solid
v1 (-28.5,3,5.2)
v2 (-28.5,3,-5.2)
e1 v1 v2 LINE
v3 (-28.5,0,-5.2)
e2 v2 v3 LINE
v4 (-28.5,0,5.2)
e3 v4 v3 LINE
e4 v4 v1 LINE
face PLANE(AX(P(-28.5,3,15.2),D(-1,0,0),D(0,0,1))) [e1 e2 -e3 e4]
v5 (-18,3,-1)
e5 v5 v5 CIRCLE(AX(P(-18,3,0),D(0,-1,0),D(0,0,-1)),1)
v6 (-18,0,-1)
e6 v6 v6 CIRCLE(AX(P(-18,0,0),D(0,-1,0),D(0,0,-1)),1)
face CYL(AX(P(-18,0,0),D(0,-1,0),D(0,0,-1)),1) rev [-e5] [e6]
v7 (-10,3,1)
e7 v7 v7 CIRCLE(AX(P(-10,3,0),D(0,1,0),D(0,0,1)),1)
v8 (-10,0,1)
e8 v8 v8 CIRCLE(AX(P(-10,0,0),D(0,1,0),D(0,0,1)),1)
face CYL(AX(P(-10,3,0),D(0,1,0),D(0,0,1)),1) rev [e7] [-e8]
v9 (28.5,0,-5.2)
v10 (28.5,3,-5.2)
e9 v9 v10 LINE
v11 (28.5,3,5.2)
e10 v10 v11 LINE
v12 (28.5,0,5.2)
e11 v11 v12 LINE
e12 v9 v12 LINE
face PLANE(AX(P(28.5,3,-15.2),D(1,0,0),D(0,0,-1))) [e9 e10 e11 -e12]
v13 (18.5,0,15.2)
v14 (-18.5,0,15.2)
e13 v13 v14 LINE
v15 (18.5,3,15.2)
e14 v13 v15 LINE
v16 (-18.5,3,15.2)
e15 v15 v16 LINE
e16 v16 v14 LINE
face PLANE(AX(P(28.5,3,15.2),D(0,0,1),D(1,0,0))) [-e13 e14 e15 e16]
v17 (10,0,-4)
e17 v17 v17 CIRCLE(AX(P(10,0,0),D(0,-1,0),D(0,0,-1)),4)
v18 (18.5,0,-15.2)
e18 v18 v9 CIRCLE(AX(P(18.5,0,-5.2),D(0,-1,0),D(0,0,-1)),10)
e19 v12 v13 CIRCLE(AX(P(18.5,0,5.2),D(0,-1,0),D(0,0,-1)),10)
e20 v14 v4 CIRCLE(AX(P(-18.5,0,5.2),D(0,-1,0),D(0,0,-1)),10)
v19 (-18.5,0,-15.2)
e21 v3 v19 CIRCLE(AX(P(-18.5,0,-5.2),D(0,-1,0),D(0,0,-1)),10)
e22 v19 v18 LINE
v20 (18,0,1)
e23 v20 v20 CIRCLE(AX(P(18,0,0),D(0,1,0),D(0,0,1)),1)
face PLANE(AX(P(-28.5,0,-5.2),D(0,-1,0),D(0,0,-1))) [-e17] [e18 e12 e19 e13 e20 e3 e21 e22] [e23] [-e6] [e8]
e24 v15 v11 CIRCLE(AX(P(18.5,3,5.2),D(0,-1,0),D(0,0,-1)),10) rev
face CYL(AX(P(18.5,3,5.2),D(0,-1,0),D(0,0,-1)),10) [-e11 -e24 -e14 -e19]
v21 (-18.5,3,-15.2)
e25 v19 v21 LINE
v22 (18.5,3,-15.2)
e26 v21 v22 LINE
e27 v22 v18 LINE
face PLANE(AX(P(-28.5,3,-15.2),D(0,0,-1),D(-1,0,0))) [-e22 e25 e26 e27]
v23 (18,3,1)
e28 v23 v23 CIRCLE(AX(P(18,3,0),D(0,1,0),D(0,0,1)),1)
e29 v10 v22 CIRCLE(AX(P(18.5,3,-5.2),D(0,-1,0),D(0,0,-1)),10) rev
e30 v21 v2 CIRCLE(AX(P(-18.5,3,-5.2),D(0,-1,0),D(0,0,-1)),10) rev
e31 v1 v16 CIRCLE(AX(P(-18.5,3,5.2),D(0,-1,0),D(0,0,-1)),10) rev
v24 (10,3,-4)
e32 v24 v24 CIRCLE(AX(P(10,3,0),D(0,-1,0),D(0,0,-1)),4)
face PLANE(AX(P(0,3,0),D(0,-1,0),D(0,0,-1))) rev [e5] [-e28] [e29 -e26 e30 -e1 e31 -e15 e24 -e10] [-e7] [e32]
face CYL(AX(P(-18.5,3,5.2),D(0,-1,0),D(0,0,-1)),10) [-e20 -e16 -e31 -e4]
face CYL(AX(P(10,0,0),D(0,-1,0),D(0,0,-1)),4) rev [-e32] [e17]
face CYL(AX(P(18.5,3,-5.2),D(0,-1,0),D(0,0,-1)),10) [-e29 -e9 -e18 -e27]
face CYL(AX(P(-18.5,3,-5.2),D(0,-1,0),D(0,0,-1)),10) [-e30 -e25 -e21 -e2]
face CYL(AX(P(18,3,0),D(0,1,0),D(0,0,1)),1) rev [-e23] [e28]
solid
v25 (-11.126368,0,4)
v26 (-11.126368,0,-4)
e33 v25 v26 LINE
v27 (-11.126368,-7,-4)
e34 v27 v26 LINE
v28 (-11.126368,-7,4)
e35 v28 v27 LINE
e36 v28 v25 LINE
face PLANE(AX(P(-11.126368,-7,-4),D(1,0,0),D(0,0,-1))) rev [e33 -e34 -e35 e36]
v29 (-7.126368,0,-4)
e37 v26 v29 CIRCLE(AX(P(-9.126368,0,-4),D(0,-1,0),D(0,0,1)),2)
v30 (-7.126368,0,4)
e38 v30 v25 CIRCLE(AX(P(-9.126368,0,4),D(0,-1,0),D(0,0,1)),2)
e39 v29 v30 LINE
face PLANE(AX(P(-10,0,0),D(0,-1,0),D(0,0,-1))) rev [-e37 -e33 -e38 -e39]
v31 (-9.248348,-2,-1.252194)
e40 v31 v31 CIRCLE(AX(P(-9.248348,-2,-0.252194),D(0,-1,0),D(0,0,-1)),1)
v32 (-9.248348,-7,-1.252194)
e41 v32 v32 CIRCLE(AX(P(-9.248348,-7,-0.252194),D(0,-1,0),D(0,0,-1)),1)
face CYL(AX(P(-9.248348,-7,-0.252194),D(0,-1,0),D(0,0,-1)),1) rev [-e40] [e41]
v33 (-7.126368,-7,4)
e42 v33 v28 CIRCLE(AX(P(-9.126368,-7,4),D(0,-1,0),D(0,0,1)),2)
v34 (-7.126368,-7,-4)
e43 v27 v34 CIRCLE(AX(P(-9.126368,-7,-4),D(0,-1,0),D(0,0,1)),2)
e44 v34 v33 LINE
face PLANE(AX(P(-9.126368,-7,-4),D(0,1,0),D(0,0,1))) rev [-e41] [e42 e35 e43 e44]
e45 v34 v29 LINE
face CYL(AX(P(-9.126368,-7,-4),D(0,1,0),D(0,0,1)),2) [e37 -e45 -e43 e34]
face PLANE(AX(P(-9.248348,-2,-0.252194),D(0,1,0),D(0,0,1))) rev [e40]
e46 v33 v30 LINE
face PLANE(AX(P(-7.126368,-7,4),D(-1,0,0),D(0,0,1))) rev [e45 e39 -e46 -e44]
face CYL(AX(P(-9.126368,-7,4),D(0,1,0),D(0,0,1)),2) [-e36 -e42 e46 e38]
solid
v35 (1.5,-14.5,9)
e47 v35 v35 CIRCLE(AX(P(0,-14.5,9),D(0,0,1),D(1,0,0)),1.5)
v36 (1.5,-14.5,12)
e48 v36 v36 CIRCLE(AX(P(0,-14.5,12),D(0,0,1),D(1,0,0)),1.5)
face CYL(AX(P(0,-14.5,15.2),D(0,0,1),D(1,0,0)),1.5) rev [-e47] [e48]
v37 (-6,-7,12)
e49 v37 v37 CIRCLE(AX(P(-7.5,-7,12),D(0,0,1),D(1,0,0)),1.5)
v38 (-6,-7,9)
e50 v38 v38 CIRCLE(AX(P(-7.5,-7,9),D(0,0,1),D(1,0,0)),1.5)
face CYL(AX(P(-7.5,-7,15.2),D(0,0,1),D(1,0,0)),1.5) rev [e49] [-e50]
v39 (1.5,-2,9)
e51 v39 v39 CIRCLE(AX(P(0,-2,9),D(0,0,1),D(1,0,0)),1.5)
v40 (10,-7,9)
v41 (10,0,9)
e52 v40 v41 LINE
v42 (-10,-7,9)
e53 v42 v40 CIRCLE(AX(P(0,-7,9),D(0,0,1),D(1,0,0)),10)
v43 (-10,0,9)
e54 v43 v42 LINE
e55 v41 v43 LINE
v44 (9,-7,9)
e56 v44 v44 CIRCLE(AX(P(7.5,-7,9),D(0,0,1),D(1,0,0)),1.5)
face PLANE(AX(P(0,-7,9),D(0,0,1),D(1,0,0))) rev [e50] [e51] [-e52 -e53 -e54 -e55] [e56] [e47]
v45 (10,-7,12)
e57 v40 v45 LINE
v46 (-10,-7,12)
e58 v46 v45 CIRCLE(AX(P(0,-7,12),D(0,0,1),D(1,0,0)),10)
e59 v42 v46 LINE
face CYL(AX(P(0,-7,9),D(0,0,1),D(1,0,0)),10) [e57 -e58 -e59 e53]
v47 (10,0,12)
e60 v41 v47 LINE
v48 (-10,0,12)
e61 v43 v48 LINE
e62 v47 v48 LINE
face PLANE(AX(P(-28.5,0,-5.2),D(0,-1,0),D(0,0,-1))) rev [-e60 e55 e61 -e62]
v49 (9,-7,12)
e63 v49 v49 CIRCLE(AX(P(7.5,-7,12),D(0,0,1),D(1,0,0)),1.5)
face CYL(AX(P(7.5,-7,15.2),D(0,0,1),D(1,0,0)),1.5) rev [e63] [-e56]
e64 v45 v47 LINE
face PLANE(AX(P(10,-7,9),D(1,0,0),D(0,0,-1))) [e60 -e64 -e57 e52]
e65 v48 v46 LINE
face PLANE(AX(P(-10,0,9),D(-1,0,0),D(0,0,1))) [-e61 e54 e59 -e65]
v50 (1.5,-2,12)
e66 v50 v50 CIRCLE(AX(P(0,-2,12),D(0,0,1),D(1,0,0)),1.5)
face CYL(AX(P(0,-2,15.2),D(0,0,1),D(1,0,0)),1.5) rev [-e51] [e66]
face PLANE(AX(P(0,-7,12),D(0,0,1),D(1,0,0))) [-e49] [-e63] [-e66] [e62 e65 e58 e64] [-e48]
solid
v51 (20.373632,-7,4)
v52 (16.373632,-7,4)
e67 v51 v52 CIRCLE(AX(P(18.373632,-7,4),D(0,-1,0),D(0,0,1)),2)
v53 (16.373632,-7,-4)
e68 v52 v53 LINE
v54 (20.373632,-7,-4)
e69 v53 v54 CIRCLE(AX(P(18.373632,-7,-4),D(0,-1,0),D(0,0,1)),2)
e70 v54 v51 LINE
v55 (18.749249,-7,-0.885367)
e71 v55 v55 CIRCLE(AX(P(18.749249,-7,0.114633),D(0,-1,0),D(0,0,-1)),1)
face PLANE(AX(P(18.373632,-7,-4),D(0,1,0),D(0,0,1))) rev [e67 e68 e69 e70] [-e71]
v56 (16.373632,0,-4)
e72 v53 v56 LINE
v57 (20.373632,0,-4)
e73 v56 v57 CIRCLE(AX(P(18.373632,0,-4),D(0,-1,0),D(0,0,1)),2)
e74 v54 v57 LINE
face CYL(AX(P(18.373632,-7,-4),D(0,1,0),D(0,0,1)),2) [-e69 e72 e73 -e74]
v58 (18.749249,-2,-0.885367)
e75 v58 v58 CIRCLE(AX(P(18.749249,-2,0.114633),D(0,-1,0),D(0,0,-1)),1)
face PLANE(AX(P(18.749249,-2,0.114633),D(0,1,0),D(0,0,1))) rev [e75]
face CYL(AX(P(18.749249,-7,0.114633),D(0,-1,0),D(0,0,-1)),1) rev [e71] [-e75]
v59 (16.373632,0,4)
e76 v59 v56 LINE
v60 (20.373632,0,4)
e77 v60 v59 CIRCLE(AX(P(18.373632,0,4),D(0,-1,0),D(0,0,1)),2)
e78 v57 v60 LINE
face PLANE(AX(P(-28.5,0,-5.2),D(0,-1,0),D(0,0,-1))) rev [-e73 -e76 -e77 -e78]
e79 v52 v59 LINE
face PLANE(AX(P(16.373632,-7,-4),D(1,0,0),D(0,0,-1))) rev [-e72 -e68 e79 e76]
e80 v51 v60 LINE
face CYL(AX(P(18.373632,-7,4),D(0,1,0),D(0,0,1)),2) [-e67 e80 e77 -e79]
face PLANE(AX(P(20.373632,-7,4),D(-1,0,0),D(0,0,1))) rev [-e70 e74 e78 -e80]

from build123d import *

# Parameters (mm, degrees)
SKETCH1_W                    = 57
SKETCH1_H                    = 30.4
BOSS_EXTRUDE1_DEPTH          = 3
BOSS_EXTRUDE2_DEPTH          = 7
BOSS_EXTRUDE3_DEPTH          = 3
BOSS_EXTRUDE4_DEPTH          = 7
F_8_0_8_DIAMETER_HOLE1_D     = 8
F_2_0_2_DIAMETER_HOLE1_D     = 2
F_2_0_2_DIAMETER_HOLE2_D     = 2
F_2_0_2_DIAMETER_HOLE2_DEPTH = 3
F_3_0_3_DIAMETER_HOLE1_D     = 3
F_3_0_3_DIAMETER_HOLE1_DEPTH = 6.2
F_3_0_3_DIAMETER_HOLE2_D     = 3
F_3_0_3_DIAMETER_HOLE2_DEPTH = 30.4
F_2_0_2_DIAMETER_HOLE3_D     = 2
F_2_0_2_DIAMETER_HOLE3_DEPTH = 5
FILLET1_R                    = 10


with BuildPart() as part:
    # Sketch1 → Boss-Extrude1 (new body)
    with BuildSketch(Plane.XZ):
        Rectangle(SKETCH1_W, SKETCH1_H)
    extrude(amount=-BOSS_EXTRUDE1_DEPTH)

    # Sketch2 → Boss-Extrude2 (add)
    with BuildSketch(Plane.XZ):
        with BuildLine():
            Line((16.37363234, -4), (16.37363234, 4))
            ThreePointArc((16.37363234, 4), (18.37363234, 6), (20.37363234, 4))
            Line((20.37363234, 4), (20.37363234, -4))
            ThreePointArc((20.37363234, -4), (18.37363234, -6), (16.37363234, -4))
        make_face()
    extrude(amount=BOSS_EXTRUDE2_DEPTH)

    # Sketch3 → Boss-Extrude3 (add)
    with BuildSketch(Plane.XY.offset(12)):
        with BuildLine():
            Line((10, -7), (10, 0))
            Line((10, 0), (-10, 0))
            Line((-10, 0), (-10, -7))
            ThreePointArc((-10, -7), (0, -17), (10, -7))
        make_face()
    extrude(amount=-BOSS_EXTRUDE3_DEPTH)

    # Sketch4 → Boss-Extrude4 (add)
    with BuildSketch(Plane.XZ):
        with BuildLine():
            Line((-11.12636766, -4), (-11.12636766, 4))
            ThreePointArc((-11.12636766, 4), (-9.12636766, 6), (-7.12636766, 4))
            Line((-7.12636766, 4), (-7.12636766, -4))
            ThreePointArc((-7.12636766, -4), (-9.12636766, -6), (-11.12636766, -4))
        make_face()
    extrude(amount=BOSS_EXTRUDE4_DEPTH)

    # Ø8.0 (8) Diameter Hole1 (through all)
    with Locations(Plane(origin=(0, 0, 0), x_dir=(-1, 0, 0), z_dir=(0, -1, 0))):
        with Locations((-10, 0)):
            Hole(F_8_0_8_DIAMETER_HOLE1_D / 2)

    # Ø2.0 (2) Diameter Hole1 (through all)
    with Locations(Plane(origin=(0, 0, 0), x_dir=(-1, 0, 0), z_dir=(0, -1, 0))):
        with Locations((18, 0)):
            Hole(F_2_0_2_DIAMETER_HOLE1_D / 2)

    # Ø2.0 (2) Diameter Hole2
    with Locations(Plane(origin=(0, 3, 0), x_dir=(1, 0, 0), z_dir=(0, 1, 0))):
        with Locations((18, 0), (-10, 0)):
            Hole(F_2_0_2_DIAMETER_HOLE2_D / 2, depth=F_2_0_2_DIAMETER_HOLE2_DEPTH)

    # Ø3.0 (3) Diameter Hole1
    with Locations(Plane.XY.offset(15.2)):
        with Locations((-7.5, -7)):
            Hole(F_3_0_3_DIAMETER_HOLE1_D / 2, depth=F_3_0_3_DIAMETER_HOLE1_DEPTH)

    # Ø3.0 (3) Diameter Hole2
    with Locations(Plane.XY.offset(15.2)):
        with Locations((0, -2), (7.5, -7), (0, -14.5)):
            Hole(F_3_0_3_DIAMETER_HOLE2_D / 2, depth=F_3_0_3_DIAMETER_HOLE2_DEPTH)

    # Ø2.0 (2) Diameter Hole3
    with Locations(Plane(origin=(0, -7, 0), x_dir=(-1, 0, 0), z_dir=(0, -1, 0))):
        with Locations((-18.749249064, -0.114633429), (9.24834794, 0.252193543)):
            Hole(F_2_0_2_DIAMETER_HOLE3_D / 2, depth=F_2_0_2_DIAMETER_HOLE3_DEPTH)

    # Fillet1
    fillet1_edges = [part.edges().sort_by_distance(p)[0] for p in [
        (-28.5, 1.5, -15.2),
        (28.5, 1.5, -15.2),
        (-28.5, 1.5, 15.2),
        (28.5, 1.5, 15.2),
    ]]
    fillet(fillet1_edges, radius=FILLET1_R)


with BuildPart() as body_2:
    # Split1: the piece on the far side of the plane
    add(part.part)
    split(bisect_by=Plane(origin=(0, 0, 0), x_dir=(0, 0, -1), z_dir=(0, -1, 0)), keep=Keep.BOTTOM)


with BuildPart() as part_1:
    add(part.part)

    # Split1
    split(bisect_by=Plane(origin=(0, 0, 0), x_dir=(0, 0, -1), z_dir=(0, -1, 0)), keep=Keep.TOP)


solid = Compound([body_2.part, part_1.part])
